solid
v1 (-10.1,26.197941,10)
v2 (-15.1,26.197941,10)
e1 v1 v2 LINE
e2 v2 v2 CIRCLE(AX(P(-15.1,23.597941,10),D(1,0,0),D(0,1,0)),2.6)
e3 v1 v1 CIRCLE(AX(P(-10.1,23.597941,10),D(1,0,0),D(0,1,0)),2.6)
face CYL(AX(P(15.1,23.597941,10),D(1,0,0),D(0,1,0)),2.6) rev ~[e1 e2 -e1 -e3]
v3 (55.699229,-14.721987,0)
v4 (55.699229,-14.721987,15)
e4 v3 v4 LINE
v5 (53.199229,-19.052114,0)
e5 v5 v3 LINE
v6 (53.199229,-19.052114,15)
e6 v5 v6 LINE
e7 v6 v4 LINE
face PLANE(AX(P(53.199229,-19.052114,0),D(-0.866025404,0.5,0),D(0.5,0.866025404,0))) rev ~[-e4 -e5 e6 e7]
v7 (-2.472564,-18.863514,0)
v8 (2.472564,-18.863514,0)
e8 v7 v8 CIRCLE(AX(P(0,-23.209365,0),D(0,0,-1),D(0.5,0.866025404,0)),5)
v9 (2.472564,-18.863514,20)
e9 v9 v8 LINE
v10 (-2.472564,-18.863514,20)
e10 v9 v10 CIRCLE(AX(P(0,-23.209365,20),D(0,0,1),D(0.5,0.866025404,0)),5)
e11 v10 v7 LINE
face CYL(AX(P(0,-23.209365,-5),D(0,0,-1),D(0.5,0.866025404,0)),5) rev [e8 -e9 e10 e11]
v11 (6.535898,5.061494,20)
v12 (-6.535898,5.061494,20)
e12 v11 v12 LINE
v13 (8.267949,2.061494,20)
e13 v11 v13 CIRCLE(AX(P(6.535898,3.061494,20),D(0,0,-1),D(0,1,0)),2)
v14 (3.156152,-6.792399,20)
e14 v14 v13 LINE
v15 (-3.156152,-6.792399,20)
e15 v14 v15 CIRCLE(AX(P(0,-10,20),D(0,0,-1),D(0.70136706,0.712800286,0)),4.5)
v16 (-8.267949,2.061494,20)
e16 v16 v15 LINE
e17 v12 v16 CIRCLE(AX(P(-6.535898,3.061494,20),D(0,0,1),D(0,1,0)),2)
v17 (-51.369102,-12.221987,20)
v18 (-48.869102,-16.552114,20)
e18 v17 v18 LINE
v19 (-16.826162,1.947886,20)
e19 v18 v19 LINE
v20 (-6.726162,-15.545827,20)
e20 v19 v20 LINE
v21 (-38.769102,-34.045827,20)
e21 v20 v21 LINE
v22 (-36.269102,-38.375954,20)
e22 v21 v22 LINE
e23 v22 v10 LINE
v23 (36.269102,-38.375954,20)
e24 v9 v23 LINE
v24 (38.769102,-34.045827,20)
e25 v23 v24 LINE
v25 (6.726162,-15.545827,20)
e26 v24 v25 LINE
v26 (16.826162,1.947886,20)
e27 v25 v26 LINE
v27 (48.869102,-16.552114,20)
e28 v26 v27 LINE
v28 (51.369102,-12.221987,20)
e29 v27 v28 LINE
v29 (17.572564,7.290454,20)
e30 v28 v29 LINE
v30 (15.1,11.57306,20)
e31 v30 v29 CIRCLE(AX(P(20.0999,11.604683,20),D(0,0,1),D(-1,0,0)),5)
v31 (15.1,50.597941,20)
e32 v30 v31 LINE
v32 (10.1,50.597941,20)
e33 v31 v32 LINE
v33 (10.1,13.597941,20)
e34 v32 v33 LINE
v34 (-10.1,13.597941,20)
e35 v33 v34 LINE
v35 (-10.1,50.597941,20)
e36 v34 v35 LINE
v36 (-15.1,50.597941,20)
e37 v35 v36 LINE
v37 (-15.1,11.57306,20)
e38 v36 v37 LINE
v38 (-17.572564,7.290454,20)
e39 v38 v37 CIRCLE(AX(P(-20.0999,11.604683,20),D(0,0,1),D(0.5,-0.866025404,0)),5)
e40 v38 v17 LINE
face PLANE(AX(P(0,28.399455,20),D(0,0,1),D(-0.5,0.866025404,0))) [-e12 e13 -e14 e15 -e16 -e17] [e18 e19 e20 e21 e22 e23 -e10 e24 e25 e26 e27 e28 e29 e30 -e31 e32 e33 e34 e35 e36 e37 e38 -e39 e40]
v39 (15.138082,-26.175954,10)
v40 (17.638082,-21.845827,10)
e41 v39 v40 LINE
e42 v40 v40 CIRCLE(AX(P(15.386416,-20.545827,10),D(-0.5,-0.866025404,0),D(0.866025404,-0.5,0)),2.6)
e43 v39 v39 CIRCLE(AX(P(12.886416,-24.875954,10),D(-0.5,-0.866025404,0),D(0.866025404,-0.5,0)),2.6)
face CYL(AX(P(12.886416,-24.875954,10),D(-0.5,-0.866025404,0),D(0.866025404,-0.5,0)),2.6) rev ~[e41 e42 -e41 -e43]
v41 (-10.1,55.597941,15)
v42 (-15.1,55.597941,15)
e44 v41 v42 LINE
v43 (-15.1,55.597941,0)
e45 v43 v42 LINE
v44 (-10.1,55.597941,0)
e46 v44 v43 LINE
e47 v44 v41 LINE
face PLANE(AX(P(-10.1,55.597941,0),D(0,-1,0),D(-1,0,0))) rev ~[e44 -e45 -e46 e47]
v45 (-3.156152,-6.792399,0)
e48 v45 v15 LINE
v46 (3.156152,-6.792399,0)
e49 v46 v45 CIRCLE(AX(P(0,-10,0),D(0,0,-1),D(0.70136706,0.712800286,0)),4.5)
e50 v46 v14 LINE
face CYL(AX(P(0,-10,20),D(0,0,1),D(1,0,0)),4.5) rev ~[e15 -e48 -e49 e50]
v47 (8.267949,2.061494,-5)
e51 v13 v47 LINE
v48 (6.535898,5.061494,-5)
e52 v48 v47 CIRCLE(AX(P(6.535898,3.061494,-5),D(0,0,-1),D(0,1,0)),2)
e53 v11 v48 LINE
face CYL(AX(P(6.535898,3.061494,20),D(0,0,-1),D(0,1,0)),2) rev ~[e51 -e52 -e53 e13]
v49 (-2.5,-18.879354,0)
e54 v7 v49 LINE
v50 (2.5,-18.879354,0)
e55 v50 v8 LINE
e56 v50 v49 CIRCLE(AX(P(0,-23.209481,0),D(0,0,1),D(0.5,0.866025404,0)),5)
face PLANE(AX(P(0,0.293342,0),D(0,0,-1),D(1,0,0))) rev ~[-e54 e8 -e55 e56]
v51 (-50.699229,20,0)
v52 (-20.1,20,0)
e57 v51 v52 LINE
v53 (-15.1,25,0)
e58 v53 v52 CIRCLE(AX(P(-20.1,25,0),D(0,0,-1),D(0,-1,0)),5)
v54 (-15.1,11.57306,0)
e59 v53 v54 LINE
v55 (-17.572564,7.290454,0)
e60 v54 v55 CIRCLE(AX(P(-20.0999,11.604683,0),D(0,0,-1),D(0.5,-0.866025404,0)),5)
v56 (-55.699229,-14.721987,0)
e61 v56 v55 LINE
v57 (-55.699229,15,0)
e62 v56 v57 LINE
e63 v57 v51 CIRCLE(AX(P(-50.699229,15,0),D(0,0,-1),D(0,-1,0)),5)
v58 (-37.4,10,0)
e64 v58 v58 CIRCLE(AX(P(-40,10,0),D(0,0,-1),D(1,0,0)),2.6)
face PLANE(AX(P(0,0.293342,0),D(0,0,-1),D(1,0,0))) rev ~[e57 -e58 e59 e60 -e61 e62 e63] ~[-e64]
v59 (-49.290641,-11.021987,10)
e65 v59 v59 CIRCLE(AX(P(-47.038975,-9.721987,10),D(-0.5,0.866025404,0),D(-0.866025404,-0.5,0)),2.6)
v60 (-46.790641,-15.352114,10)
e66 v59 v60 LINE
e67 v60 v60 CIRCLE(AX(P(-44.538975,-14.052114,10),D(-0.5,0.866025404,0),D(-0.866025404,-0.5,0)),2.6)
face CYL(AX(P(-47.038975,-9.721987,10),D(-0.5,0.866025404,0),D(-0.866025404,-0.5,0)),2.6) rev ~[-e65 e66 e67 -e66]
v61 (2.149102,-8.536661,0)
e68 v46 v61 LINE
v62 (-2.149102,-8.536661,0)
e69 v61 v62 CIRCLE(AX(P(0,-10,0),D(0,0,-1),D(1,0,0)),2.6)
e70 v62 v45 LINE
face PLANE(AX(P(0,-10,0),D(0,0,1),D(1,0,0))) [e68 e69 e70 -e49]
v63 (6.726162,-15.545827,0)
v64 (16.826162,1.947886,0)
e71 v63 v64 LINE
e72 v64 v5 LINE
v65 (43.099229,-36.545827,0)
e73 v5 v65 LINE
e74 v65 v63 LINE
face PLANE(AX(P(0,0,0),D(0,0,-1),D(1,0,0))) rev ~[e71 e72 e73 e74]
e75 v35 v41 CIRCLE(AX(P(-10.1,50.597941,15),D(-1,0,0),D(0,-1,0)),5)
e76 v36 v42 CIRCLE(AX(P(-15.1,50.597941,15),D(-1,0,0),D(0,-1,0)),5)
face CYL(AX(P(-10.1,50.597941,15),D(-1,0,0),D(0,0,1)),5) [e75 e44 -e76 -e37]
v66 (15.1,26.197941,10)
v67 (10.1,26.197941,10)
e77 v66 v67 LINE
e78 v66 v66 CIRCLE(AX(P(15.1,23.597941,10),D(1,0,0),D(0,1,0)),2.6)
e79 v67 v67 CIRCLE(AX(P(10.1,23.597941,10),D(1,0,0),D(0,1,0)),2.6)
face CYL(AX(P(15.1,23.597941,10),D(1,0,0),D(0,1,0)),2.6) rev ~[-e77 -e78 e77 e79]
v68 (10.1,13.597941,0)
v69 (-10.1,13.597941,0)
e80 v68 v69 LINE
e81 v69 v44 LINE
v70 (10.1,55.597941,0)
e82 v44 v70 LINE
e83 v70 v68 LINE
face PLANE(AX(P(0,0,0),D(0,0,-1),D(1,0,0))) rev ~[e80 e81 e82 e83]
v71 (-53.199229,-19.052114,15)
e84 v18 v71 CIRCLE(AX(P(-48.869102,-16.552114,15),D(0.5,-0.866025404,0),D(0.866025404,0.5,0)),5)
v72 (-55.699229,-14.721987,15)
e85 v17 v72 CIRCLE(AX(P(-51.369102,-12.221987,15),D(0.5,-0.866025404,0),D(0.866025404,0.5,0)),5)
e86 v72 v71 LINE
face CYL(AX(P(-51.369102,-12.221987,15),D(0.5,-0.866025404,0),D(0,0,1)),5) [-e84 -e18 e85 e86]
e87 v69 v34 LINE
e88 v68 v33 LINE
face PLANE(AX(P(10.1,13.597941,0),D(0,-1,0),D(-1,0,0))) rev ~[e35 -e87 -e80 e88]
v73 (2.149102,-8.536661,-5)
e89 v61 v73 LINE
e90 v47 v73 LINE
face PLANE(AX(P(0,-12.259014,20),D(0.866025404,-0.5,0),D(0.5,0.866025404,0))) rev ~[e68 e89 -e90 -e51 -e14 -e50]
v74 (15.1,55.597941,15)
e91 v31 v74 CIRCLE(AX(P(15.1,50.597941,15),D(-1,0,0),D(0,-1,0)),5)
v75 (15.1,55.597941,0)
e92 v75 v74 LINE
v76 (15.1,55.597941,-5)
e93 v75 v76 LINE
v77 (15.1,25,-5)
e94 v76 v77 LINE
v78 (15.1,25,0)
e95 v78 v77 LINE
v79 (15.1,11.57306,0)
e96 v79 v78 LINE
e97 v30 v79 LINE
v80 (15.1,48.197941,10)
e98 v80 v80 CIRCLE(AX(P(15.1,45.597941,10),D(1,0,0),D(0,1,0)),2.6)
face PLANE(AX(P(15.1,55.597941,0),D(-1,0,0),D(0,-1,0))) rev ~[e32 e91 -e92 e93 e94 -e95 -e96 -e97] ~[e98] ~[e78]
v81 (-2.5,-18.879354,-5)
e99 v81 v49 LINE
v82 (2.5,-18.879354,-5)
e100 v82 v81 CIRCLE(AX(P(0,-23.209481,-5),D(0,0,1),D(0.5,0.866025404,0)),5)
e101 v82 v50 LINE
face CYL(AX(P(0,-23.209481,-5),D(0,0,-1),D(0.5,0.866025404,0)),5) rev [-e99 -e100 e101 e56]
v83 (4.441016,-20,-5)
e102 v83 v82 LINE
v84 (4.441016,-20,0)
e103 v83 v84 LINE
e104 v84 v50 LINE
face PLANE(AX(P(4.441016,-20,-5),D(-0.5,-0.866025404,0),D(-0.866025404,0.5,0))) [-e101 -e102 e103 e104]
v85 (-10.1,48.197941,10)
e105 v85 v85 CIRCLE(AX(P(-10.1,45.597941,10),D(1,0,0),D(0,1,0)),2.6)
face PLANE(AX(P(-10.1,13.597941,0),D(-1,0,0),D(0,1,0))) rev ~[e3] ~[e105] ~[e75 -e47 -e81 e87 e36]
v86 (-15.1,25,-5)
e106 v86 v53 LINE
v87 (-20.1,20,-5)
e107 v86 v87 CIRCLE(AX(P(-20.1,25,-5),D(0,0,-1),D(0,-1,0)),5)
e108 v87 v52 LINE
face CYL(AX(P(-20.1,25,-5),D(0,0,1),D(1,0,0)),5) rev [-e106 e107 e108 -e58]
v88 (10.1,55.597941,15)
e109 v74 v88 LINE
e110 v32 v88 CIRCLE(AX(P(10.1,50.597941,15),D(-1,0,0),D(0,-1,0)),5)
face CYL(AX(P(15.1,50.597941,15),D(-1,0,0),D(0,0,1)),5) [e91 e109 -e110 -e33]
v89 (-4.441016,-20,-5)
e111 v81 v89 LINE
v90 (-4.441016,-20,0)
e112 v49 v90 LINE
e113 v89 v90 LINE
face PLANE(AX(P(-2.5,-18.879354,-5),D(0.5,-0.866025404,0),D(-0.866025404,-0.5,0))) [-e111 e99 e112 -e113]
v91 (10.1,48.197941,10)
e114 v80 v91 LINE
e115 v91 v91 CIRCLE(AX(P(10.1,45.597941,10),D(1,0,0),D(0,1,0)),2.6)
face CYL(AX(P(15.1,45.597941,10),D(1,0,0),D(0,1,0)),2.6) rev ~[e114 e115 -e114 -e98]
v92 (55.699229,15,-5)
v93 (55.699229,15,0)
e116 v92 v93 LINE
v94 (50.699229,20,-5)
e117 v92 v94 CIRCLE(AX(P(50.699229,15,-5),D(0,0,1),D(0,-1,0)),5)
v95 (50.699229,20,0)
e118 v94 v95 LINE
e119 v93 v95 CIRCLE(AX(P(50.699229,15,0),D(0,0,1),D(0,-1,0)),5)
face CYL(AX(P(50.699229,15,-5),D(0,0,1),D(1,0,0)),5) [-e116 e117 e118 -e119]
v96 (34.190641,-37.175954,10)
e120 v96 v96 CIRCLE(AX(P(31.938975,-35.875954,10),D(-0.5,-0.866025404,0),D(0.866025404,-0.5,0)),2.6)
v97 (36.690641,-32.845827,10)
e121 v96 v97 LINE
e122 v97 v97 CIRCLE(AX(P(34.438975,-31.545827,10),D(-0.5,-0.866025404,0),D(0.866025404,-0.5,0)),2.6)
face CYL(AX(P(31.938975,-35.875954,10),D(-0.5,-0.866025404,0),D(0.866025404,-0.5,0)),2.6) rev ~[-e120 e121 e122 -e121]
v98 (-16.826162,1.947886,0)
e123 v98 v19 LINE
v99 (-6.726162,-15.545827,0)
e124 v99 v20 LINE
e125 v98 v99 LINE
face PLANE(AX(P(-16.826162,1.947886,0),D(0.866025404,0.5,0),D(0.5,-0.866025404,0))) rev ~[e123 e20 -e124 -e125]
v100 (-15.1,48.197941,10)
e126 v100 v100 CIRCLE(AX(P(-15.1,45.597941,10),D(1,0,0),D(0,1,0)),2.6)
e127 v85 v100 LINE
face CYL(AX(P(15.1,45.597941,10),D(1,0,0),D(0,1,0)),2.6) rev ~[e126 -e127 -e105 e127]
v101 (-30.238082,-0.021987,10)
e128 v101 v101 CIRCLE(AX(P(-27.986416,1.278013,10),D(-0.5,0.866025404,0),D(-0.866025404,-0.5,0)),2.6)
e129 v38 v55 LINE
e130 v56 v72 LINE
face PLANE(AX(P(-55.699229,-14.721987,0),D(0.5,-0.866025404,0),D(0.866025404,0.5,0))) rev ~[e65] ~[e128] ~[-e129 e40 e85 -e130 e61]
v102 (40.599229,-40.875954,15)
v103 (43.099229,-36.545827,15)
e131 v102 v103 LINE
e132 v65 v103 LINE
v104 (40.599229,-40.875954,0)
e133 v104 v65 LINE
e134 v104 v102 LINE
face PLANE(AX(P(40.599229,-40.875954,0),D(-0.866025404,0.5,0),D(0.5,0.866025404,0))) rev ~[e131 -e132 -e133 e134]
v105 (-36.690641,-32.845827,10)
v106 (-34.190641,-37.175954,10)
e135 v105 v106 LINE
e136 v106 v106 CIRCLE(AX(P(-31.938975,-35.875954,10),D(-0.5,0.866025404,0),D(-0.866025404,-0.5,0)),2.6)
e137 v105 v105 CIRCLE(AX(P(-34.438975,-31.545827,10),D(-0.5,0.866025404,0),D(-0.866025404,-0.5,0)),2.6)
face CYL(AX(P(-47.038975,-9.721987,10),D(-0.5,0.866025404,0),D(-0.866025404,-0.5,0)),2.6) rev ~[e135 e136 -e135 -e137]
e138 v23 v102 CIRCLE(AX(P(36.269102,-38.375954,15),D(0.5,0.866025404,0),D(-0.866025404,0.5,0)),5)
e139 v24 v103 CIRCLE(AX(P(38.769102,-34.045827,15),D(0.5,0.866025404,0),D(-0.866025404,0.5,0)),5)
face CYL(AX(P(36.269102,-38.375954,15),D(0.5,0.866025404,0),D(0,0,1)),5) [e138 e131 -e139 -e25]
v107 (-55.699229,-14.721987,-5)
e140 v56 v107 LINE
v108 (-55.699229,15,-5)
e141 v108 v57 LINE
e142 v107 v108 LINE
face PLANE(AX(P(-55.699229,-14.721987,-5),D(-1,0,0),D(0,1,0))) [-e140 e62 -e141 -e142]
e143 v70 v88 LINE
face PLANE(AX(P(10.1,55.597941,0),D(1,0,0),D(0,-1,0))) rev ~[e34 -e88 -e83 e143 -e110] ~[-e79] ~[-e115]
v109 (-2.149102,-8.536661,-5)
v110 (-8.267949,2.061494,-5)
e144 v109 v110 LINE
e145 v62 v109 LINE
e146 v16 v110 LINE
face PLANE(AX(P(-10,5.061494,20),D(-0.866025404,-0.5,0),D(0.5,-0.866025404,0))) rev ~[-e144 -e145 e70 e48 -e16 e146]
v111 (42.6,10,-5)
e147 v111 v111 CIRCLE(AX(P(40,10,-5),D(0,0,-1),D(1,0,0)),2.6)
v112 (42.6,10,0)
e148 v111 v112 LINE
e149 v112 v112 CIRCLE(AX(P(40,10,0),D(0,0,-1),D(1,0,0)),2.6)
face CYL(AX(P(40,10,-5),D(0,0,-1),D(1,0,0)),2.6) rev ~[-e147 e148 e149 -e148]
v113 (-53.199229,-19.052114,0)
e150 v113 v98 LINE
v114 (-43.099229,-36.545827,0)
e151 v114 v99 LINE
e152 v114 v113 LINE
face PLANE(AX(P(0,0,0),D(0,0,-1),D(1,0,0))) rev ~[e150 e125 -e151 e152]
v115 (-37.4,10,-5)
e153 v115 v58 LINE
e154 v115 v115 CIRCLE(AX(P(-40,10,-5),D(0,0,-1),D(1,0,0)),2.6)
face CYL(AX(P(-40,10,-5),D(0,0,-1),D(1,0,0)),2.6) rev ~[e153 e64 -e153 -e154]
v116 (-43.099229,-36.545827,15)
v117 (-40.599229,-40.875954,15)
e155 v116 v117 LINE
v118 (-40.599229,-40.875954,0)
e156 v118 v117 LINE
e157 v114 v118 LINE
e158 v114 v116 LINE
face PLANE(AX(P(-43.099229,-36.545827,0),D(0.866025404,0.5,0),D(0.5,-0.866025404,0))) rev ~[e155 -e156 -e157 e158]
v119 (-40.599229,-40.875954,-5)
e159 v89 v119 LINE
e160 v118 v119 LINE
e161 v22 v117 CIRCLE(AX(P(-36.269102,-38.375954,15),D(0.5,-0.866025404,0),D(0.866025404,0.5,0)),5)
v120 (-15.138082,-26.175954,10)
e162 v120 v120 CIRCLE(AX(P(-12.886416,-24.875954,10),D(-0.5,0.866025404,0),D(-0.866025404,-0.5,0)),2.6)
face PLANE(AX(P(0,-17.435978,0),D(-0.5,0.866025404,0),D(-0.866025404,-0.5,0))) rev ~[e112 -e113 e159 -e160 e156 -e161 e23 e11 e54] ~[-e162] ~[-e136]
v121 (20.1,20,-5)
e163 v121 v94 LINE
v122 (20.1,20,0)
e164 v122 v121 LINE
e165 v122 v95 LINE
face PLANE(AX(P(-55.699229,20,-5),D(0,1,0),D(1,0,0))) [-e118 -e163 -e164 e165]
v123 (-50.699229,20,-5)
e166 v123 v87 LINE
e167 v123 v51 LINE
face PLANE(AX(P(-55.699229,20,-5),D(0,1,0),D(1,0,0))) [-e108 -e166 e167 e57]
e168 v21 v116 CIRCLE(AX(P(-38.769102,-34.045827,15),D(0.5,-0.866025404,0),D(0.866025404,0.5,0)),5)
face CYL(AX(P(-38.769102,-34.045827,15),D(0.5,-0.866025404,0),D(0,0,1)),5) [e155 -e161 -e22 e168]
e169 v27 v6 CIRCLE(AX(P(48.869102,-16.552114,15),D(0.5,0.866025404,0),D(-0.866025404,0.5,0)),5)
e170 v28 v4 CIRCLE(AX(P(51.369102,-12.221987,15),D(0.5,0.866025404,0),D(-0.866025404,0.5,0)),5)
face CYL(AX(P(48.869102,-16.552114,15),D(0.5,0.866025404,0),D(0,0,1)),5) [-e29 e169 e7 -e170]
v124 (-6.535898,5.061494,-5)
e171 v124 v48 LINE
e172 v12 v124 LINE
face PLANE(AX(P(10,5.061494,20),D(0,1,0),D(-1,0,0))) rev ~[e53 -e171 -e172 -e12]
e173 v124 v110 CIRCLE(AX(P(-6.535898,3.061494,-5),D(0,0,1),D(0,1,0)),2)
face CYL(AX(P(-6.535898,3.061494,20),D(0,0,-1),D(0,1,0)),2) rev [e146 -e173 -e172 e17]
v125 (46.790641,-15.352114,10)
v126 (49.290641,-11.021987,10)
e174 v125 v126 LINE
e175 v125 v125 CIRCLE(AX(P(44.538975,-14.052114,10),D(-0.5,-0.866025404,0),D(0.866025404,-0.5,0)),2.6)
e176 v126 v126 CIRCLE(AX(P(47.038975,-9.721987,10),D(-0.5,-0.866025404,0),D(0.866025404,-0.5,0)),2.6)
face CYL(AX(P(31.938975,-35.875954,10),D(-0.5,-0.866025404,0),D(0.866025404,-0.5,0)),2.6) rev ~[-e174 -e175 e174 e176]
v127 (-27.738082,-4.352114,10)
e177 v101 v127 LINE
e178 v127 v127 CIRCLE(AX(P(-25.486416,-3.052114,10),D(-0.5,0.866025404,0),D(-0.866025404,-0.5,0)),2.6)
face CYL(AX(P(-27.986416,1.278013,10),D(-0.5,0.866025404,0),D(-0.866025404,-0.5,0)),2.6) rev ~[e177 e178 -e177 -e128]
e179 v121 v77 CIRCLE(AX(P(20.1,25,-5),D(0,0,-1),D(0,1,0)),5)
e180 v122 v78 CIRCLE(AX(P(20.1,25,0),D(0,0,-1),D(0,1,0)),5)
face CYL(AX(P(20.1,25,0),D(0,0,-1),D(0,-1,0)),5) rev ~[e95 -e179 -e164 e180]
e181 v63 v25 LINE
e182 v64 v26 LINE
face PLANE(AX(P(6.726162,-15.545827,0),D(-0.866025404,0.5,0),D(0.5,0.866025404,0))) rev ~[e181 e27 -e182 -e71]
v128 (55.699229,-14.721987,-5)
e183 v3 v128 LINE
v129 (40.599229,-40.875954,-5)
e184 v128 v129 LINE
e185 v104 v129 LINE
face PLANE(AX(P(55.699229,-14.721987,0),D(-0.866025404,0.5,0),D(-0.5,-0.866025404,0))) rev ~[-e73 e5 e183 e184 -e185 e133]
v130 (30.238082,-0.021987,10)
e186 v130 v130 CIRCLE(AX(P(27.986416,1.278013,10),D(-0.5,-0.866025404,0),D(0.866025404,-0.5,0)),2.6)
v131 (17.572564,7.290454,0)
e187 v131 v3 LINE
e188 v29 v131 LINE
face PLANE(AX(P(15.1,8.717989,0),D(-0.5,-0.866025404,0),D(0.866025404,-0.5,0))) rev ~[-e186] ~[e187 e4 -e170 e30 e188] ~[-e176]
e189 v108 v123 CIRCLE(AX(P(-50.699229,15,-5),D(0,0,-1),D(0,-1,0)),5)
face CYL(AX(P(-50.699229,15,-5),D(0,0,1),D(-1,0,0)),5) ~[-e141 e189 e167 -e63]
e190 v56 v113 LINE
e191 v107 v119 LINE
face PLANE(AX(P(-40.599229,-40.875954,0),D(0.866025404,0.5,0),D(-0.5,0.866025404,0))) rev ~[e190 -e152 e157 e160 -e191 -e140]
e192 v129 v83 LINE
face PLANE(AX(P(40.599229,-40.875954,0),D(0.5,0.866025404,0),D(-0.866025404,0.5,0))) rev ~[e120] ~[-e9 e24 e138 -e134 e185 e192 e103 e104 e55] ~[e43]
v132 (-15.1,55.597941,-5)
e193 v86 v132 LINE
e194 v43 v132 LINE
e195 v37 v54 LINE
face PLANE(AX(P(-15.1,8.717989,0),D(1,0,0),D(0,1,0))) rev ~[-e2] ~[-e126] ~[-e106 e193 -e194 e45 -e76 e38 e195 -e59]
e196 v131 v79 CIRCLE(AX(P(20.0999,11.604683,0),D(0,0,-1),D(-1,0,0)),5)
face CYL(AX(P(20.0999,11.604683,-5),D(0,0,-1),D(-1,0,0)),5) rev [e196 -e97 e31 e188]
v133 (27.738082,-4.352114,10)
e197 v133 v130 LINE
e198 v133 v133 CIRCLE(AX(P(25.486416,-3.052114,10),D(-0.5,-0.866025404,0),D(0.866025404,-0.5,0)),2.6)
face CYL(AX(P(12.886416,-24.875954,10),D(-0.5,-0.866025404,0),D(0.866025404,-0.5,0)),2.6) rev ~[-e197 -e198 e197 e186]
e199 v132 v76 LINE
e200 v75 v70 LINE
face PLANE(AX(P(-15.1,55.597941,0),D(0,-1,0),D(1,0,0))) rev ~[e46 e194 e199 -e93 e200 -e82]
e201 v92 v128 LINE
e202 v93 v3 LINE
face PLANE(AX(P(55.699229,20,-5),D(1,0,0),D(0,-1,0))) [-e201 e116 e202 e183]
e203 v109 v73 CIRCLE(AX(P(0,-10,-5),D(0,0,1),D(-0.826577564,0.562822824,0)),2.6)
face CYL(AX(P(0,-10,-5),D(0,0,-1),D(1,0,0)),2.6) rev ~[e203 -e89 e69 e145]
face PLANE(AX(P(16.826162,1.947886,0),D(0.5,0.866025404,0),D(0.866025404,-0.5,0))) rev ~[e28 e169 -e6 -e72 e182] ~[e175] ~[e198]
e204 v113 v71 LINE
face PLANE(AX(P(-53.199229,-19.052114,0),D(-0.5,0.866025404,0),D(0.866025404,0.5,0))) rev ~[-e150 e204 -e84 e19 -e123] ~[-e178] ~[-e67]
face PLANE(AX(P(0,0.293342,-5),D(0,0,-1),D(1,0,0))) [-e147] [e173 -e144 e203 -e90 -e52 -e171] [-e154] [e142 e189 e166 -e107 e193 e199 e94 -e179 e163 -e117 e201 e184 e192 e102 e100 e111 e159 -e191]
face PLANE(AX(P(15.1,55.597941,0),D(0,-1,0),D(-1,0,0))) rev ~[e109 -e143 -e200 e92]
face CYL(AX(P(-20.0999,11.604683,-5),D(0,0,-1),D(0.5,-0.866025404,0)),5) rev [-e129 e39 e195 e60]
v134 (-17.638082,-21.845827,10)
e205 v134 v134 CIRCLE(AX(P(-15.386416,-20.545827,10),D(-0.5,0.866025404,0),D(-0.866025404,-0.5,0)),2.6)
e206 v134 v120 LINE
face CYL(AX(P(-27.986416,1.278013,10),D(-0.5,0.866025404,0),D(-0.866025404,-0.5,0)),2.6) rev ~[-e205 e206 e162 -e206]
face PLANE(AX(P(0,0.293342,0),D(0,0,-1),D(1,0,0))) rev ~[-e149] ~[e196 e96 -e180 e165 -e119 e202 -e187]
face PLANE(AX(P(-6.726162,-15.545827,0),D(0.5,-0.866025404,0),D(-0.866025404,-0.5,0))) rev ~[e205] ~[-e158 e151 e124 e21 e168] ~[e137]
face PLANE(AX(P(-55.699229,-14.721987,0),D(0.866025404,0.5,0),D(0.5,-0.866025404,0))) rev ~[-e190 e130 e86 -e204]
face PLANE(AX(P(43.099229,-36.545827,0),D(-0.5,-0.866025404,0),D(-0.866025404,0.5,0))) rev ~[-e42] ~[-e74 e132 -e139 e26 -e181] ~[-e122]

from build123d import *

# Parameters (mm, degrees)
F1_DEPTH    = 20
F2_R        = 2.6
F3_DEPTH    = 50.6016350946
F4_COUNT    = 3
F4_ANGLE    = 240
F6_DEPTH    = 5
F7_T1_DEPTH = 25
F10_DEPTH   = 5
F11_DEPTH   = 25.001
F12_R       = 2
F13_R       = 2.6
F14_DEPTH   = 25.001
F15_R       = 5
F16_R       = 4.5
F17_DEPTH   = 20


# Not quite as in the source:
# - a fillet or chamfer that OpenCascade refuses, or shapes differently, is made with other operations: its cross-section is extruded or revolved along the edge and cut away or added


with BuildPart() as f1:
    # F0 (on Top) → F1 (new body)
    with BuildSketch(Plane.XY):
        Polygon((43.0992290895, -36.5458269543), (6.7261621305, -15.5458269543), (16.8261621305, 1.9478862021), (53.1992290895, -19.0521137979), (55.6992290895, -14.7219867789), (14.8979589003, 8.8346375481), (0, 0), (-0.2020410997, -17.3193296462), (40.5992290895, -40.8759539732), align=None)
    extrude(amount=F1_DEPTH)

    # F2 (on face) → F3 (cut, through all)
    with BuildSketch(Plane(origin=(-7.55, -13.0769835971, 0), x_dir=(0.8660254038, -0.5, 0), z_dir=(-0.5, -0.8660254038, 0))):
        with Locations((45.5979407522, 10)):
            Circle(F2_R)
        with Locations((23.5979407522, 10)):
            Circle(F2_R)
    extrude(amount=-F3_DEPTH, mode=Mode.SUBTRACT)

    # F4: F1 ×3 about axis
    f4_axis = Axis((0, 0, 10), (0, 0, -1))


with BuildPart() as f1_1:
    add(f1.part)
    for i in range(1, F4_COUNT):
        add(f1.part.rotate(f4_axis, i * F4_ANGLE / (F4_COUNT - 1)))

    # F5 (on face) → F6 (join)
    with BuildSketch(Plane(origin=(0, 0, 0), x_dir=(1, 0, 0), z_dir=(0, 0, -1))):
        Polygon((0, 17.4359781295), (-40.5992290895, 40.8759539732), (-55.6992290895, 14.7219867789), (-15.1, -8.7179890648), (-15.1, -55.5979407522), (15.1, -55.5979407522), (15.1, -8.7179890648), (55.6992290895, 14.7219867789), (40.5992290895, 40.8759539732), align=None)
    extrude(amount=F6_DEPTH)

    # F7: fillet of radius 5 on 3 edges, made by hand

    # F7_s2 → F7_t1 (join)
    with BuildSketch(Plane.XY.offset(-5)):
        with BuildLine():
            ThreePointArc((2.5, -18.8792383324), (0, -18.2093653514), (-2.5, -18.8792383324))
            Line((-2.5, -18.8792383324), (-2.55, -18.7926357921))
            ThreePointArc((-2.55, -18.7926357921), (-1.299975, -18.0710489919), (-0.05, -17.3493755891))
            Line((-0.05, -17.3493755891), (0.05, -17.3493755891))
            ThreePointArc((0.05, -17.3493755891), (1.299975, -18.0710489919), (2.55, -18.7926357921))
            Line((2.55, -18.7926357921), (2.5, -18.8792383324))
        make_face()
        with BuildLine():
            ThreePointArc((15.0999, 11.6046826757), (15.7697729811, 9.1046826757), (17.5999, 7.2745556568))
            Line((17.5999, 7.2745556568), (17.5499, 7.1879531164))
            ThreePointArc((17.5499, 7.1879531164), (16.299975, 7.9097131217), (15.05, 8.6313865244))
            Line((15.05, 8.6313865244), (15, 8.7179890648))
            ThreePointArc((15, 8.7179890648), (15, 10.1613358702), (14.9999, 11.6046826757))
            Line((14.9999, 11.6046826757), (15.0999, 11.6046826757))
        make_face()
        with BuildLine():
            ThreePointArc((-17.5999, 7.2745556568), (-15.7697729811, 9.1046826757), (-15.0999, 11.6046826757))
            Line((-15.0999, 11.6046826757), (-14.9999, 11.6046826757))
            ThreePointArc((-14.9999, 11.6046826757), (-15, 10.1613358702), (-15, 8.7179890648))
            Line((-15, 8.7179890648), (-15.05, 8.6313865244))
            ThreePointArc((-15.05, 8.6313865244), (-16.299975, 7.9097131217), (-17.5499, 7.1879531164))
            Line((-17.5499, 7.1879531164), (-17.5999, 7.2745556568))
        make_face()
    extrude(amount=F7_T1_DEPTH)

    # F9 (on face) → F10 (join)
    with BuildSketch(Plane(origin=(0, 0, -5), x_dir=(1, 0, 0), z_dir=(0, 0, -1))):
        with BuildLine():
            Line((-55.6992290895, 14.7219867789), (-55.6992290895, -20))
            Line((-55.6992290895, -20), (55.6992290895, -20))
            Line((55.6992290895, -20), (55.6992290895, 14.7219867789))
            Line((55.6992290895, 14.7219867789), (52.6519667355, 20))
            Line((52.6519667355, 20), (4.4410161514, 20))
            Line((4.4410161514, 20), (2.5, 18.8793538025))
            ThreePointArc((2.5, 18.8793538025), (0, 18.2094808214), (-2.5, 18.8793538025))
            Line((-2.5, 18.8793538025), (-4.4410161514, 20))
            Line((-4.4410161514, 20), (-52.6519667355, 20))
            Line((-52.6519667355, 20), (-55.6992290895, 14.7219867789))
        make_face()
    extrude(amount=-F10_DEPTH)

    # F8 (on face) → F11 (cut, through all)
    with BuildSketch(Plane.XY.offset(20)):
        Polygon((10, 5.0614941438), (-10, 5.0614941438), (0, -12.2590139319), align=None)
    extrude(amount=-F11_DEPTH, mode=Mode.SUBTRACT)

    # F12
    f12_edges = [f1_1.edges().sort_by_distance(p)[0] for p in [
        (10, 5.061494, 7.5),
        (-10, 5.061494, 7.5),
        (0, -12.259014, 7.5),
    ]]
    fillet(f12_edges, radius=F12_R)

    # F13 (on face) → F14 (cut, through all)
    with BuildSketch(Plane(origin=(0, 0, -5), x_dir=(1, 0, 0), z_dir=(0, 0, -1))):
        with Locations((-40, -10)):
            Circle(F13_R)
        with Locations((40, -10)):
            Circle(F13_R)
        with Locations((0, 10)):
            Circle(F13_R)
    extrude(amount=-F14_DEPTH, mode=Mode.SUBTRACT)

    # F15
    f15_edges = [f1_1.edges().sort_by_distance(p)[0] for p in [
        (-15.1, 20, -2.5),
        (15.1, 20, -2.5),
        (55.699229, 20, -2.5),
        (-55.699229, 20, -2.5),
        (-12.6, 55.597941, 20),
        (12.6, 55.597941, 20),
        (-54.449229, -16.88705, 20),
        (-41.849229, -38.71089, 20),
        (54.449229, -16.88705, 20),
        (41.849229, -38.71089, 20),
    ]]
    fillet(f15_edges, radius=F15_R)

    # F16 (on face) → F17 (cut)
    with BuildSketch(Plane.XY.offset(20)):
        with Locations((0, -10)):
            Circle(F16_R)
    extrude(amount=-F17_DEPTH, mode=Mode.SUBTRACT)


solid = f1_1.part
